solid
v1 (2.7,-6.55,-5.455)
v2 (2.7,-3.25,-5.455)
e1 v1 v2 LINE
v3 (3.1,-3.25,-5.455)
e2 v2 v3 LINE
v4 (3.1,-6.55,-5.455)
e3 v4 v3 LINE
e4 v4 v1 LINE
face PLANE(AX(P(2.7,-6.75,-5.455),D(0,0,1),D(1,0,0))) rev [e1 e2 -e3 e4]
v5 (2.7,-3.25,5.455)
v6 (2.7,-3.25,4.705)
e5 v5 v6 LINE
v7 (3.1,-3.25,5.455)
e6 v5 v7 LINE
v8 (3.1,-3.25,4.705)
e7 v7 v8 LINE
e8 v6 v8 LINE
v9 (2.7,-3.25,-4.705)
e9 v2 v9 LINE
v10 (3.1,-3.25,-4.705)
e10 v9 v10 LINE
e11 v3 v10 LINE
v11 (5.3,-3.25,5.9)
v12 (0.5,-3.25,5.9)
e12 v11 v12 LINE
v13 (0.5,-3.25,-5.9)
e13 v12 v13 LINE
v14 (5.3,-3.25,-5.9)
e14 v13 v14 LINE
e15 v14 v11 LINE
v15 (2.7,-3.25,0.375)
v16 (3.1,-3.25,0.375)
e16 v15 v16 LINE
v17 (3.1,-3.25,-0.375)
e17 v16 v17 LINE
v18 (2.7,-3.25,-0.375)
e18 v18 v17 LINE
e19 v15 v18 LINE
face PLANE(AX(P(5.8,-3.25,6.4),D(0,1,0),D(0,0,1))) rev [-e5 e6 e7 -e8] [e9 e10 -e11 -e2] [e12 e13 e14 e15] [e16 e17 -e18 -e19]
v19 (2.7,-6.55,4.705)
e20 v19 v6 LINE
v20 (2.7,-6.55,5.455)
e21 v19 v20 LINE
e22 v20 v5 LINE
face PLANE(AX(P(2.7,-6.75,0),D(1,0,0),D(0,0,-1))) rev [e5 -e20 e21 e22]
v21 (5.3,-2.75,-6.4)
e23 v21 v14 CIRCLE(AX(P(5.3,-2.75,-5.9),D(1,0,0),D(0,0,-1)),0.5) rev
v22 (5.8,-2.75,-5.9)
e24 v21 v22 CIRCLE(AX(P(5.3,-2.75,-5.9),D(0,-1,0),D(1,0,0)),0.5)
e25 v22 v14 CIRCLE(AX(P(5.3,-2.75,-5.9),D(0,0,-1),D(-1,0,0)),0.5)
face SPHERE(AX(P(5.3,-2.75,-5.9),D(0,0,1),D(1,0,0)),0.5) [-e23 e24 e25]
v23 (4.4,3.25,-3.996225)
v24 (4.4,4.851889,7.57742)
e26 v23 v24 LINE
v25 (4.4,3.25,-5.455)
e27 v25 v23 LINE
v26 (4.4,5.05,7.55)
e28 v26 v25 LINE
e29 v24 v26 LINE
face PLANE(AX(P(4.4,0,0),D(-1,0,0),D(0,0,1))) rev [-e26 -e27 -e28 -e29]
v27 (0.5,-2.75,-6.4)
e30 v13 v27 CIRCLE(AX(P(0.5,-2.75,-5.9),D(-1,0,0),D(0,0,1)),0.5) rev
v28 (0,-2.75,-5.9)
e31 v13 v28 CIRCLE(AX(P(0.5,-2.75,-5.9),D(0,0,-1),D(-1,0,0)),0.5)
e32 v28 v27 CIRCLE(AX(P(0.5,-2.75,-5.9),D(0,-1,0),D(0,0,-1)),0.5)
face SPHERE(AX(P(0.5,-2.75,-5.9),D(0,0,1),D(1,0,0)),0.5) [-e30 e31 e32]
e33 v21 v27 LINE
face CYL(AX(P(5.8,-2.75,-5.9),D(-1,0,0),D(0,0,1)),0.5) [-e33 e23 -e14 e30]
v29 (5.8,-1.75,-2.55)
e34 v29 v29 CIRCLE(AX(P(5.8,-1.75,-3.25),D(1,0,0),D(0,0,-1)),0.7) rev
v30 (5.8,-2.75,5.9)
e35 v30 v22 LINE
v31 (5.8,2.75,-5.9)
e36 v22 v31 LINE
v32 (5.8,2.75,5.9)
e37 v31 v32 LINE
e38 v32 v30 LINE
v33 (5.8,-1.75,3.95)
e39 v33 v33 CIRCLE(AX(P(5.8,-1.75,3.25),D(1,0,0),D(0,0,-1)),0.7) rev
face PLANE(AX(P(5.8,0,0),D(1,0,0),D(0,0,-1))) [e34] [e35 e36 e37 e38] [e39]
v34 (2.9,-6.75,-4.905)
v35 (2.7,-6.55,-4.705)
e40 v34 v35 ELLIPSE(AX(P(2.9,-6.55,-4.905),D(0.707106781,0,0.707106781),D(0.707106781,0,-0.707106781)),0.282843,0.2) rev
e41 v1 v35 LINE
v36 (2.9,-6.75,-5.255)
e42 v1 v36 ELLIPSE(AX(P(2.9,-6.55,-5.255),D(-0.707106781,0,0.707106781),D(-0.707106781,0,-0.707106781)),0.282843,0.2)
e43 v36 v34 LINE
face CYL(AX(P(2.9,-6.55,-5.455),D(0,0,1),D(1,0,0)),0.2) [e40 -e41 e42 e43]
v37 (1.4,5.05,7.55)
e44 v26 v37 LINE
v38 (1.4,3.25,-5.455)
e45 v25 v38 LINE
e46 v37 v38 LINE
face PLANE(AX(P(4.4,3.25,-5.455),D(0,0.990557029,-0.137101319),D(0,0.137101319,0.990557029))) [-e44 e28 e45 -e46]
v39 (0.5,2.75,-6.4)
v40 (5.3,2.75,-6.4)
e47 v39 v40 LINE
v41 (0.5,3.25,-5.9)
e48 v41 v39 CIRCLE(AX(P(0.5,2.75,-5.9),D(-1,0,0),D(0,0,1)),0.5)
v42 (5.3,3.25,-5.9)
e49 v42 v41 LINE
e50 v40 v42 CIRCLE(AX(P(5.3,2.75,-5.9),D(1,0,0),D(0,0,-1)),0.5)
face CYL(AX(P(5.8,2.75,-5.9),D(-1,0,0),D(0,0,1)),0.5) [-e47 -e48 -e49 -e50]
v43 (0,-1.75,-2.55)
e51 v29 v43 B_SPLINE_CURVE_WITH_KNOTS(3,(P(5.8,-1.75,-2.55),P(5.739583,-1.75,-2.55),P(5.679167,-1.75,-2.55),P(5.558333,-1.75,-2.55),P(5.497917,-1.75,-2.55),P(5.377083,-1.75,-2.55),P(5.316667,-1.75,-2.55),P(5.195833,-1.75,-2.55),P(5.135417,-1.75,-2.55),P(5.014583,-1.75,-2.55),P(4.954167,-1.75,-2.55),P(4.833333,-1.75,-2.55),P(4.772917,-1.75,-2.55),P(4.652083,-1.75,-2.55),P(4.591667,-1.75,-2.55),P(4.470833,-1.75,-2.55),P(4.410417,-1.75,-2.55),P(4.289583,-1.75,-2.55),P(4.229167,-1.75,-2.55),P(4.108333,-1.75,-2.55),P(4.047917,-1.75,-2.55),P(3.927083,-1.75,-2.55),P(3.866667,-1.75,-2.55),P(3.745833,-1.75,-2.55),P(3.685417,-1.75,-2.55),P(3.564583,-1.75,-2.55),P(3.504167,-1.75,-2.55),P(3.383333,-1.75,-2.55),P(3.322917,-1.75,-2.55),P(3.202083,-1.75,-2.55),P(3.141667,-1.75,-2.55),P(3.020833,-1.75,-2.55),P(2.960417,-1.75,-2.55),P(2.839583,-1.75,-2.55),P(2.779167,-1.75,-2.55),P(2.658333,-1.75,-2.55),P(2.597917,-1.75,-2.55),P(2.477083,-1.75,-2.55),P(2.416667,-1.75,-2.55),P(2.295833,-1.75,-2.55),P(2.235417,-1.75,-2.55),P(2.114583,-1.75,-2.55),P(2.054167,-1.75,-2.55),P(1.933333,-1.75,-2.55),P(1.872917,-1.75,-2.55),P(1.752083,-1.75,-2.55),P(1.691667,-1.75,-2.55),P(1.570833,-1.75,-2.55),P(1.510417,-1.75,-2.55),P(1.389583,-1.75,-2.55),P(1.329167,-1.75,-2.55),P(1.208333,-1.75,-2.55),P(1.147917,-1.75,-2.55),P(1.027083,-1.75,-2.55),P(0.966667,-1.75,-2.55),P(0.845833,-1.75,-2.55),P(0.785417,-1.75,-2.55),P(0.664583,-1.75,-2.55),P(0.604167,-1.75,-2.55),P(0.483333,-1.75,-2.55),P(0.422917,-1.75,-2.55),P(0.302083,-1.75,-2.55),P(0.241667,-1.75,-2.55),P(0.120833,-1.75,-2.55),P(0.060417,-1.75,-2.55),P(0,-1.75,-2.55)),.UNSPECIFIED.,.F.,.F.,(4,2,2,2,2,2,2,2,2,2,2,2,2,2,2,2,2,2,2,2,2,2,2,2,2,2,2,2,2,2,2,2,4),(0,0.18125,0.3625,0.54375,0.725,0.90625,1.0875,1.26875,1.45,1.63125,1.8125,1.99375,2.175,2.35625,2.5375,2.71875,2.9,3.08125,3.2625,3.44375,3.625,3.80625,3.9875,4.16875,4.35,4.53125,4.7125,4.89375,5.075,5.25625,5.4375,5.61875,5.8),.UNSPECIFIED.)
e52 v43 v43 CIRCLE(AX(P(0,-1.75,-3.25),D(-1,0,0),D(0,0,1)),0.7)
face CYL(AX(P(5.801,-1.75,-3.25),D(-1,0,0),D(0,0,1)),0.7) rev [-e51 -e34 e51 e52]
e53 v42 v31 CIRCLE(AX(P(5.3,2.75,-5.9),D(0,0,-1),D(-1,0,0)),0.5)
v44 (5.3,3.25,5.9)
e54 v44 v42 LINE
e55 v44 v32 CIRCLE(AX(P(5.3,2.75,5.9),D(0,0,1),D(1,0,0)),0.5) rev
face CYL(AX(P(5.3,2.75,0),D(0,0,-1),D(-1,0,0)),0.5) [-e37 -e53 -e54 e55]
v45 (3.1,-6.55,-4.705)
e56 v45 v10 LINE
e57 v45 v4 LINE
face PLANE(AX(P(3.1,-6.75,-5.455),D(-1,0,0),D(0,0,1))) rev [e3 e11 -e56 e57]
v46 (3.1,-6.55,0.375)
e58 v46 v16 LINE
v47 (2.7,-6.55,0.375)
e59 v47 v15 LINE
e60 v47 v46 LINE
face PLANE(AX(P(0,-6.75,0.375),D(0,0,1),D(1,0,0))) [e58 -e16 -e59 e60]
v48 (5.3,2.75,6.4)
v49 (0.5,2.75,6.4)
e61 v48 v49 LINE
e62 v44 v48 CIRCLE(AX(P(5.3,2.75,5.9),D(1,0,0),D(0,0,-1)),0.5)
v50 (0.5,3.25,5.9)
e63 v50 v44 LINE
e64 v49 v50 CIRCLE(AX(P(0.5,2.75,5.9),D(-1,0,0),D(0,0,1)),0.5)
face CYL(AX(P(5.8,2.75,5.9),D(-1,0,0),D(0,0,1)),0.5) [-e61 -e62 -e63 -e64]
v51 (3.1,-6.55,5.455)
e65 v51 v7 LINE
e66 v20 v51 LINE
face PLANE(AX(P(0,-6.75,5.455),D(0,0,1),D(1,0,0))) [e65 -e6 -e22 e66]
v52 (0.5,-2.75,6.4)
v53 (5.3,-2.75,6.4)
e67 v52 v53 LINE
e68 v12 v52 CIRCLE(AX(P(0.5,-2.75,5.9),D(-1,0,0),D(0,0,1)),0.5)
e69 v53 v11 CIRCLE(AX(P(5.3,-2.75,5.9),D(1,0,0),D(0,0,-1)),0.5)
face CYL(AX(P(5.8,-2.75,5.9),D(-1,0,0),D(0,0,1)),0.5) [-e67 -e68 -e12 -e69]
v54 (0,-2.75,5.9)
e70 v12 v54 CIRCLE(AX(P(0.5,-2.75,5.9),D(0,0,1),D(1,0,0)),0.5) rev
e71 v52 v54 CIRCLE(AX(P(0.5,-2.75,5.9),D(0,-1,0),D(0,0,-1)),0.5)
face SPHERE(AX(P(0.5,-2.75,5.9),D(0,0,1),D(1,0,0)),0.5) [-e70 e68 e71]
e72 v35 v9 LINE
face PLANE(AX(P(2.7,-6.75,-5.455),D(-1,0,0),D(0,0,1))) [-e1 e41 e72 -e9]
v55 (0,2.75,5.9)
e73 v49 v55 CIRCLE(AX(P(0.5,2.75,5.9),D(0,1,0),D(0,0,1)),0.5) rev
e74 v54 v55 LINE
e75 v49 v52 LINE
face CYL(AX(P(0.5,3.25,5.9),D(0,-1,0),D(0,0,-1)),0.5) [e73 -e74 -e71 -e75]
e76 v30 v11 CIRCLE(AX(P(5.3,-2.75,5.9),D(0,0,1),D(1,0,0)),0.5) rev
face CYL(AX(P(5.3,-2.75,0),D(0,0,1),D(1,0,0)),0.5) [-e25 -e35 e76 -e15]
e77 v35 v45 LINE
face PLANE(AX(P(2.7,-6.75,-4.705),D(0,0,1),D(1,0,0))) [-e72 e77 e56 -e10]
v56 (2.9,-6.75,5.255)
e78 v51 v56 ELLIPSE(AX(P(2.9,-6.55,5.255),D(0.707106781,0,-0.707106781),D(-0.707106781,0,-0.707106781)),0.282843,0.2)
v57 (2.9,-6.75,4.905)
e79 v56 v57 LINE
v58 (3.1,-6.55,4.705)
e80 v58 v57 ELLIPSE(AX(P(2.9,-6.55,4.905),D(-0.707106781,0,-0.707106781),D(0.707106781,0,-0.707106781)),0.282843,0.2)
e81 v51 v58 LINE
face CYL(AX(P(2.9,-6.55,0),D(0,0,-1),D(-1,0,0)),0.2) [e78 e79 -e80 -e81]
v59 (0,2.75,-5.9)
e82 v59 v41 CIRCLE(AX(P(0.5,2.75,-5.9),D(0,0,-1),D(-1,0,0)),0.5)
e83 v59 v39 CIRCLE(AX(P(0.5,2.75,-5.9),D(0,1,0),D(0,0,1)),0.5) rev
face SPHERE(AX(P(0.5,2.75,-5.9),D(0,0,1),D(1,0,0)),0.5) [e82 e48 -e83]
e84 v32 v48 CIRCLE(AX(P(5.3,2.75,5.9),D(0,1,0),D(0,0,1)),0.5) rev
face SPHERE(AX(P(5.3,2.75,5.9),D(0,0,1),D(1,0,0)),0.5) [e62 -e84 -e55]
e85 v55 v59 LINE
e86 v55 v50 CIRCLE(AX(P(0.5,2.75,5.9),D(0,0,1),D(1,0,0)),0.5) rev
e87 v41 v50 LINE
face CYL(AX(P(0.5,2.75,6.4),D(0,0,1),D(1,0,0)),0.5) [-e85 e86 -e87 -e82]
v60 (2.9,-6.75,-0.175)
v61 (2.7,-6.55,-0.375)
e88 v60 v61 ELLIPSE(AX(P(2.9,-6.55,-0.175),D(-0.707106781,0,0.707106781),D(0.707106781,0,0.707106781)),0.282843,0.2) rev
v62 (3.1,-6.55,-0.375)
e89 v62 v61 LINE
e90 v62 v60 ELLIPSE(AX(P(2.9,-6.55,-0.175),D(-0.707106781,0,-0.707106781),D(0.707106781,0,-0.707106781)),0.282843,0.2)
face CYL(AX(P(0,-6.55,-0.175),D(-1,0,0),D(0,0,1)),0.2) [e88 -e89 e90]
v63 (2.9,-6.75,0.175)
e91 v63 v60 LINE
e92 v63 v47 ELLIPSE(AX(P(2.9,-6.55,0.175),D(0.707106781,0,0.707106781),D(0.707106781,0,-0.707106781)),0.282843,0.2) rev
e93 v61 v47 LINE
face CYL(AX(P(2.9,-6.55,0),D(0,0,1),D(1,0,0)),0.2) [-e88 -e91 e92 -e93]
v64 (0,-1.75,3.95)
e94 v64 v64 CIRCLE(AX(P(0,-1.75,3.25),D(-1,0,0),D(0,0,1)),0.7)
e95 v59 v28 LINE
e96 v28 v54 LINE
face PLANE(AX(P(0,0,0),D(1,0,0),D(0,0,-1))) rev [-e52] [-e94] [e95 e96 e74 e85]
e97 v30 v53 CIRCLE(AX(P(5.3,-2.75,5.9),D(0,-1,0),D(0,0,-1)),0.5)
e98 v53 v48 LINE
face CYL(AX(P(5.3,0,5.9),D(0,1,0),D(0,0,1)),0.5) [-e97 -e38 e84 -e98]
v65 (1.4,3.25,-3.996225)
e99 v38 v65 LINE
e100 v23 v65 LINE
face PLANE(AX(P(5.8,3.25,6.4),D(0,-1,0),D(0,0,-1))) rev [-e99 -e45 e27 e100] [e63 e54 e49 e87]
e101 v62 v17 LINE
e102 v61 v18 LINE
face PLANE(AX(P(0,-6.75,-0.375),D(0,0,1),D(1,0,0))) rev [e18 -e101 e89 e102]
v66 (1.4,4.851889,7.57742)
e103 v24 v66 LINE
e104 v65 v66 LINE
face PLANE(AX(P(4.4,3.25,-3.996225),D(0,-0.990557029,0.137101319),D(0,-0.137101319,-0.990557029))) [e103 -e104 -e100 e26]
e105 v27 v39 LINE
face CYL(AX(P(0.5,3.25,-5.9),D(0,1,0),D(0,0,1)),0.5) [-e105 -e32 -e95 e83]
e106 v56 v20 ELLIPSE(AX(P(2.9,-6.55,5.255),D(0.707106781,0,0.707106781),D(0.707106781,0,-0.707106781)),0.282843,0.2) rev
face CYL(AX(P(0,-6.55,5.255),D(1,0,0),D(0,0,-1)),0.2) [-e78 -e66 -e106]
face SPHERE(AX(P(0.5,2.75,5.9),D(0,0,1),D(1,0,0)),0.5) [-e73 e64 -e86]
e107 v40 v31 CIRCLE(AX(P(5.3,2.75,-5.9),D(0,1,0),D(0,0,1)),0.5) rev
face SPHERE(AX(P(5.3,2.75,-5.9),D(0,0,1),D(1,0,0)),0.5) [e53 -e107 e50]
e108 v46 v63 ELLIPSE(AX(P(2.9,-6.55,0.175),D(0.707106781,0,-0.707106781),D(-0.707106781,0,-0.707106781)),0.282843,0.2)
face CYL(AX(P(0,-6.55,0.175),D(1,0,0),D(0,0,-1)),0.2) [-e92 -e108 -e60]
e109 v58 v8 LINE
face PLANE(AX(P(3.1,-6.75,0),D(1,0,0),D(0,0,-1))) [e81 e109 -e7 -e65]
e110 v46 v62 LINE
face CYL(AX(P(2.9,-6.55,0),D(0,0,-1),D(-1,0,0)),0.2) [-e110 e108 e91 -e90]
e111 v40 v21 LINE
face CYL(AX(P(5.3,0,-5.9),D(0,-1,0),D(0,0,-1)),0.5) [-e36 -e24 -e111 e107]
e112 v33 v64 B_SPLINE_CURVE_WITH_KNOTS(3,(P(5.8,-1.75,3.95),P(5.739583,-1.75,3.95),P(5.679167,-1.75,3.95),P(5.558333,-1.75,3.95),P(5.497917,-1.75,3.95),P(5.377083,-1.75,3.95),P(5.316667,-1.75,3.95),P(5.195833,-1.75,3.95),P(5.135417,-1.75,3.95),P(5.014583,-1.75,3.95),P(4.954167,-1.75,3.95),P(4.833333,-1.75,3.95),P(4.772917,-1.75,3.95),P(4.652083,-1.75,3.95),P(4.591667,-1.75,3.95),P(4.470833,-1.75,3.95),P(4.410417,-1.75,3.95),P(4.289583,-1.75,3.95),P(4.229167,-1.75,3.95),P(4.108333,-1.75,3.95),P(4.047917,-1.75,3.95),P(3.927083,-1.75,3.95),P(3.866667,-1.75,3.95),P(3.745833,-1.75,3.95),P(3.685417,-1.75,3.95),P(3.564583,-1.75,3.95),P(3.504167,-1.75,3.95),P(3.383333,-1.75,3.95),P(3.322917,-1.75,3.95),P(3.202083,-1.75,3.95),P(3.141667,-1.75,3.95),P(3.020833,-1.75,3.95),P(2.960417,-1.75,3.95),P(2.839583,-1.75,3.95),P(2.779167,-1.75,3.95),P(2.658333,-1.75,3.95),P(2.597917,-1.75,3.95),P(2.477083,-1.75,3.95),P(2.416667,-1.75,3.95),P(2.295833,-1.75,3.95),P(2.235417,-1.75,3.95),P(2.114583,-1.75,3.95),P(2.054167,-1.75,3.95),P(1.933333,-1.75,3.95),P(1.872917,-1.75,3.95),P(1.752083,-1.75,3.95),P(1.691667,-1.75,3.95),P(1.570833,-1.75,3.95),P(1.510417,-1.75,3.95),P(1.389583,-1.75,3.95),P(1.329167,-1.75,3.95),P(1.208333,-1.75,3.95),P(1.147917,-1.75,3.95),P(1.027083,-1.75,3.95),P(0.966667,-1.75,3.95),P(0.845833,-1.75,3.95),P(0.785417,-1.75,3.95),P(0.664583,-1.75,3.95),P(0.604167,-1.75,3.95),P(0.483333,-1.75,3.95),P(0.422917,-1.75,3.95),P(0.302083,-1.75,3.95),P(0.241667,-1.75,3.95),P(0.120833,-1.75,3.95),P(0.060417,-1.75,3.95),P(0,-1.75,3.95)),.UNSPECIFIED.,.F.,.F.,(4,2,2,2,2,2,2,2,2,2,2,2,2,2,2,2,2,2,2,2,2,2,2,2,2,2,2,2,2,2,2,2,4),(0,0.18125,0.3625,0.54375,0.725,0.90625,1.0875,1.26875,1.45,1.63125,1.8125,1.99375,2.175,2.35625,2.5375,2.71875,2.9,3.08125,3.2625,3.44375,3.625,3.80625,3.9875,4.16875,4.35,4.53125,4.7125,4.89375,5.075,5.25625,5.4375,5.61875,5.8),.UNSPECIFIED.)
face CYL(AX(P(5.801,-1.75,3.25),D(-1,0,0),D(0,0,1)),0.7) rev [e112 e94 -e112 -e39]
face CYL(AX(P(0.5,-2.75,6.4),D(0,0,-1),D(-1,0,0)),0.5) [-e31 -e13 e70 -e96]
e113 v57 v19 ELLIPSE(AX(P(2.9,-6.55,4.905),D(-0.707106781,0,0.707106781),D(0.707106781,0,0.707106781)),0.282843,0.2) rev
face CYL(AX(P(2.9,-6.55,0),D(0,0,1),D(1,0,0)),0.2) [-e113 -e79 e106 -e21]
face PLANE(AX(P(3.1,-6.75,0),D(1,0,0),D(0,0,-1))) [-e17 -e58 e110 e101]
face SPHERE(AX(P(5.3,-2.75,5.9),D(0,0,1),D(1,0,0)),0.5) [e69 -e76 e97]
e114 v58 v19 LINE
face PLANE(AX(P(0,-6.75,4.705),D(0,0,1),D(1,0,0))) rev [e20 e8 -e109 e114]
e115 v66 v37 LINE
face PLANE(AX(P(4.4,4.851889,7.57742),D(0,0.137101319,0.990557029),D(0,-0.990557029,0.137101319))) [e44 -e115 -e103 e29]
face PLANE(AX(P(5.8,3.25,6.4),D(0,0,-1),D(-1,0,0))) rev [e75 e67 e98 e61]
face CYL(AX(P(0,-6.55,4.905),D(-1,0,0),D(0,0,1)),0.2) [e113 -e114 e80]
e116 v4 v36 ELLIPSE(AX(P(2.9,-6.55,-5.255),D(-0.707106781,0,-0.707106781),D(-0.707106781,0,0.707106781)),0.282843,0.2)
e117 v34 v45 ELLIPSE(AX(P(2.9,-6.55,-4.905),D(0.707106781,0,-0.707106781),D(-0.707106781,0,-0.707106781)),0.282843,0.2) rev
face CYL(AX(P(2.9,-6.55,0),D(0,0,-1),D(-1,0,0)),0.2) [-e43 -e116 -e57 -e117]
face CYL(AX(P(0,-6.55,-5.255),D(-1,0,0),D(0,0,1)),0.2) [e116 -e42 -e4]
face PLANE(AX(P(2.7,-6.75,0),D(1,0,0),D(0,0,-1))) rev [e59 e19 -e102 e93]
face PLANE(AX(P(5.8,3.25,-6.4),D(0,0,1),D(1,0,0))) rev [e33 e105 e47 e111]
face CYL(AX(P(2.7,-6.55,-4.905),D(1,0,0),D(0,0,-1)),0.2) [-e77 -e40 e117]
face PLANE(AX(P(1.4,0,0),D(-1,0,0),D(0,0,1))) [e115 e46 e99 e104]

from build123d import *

# Parameters (mm, degrees)
SKETCH3_W           = 12.8
SKETCH3_H           = 6.5
BOSS_EXTRUDE1_DEPTH = 5.8
SKETCH4_W           = 0.4
SKETCH4_H           = 0.375
SKETCH4_H_2         = 0.75
BOSS_EXTRUDE2_DEPTH = 3.5
FILLET1_R           = 0.2
CUT_EXTRUDE1_REACH  = 12.962
SKETCH5_R           = 0.7
BOSS_EXTRUDE4_START = -1.4
BOSS_EXTRUDE4_DEPTH = 3
FILLET2_R           = 0.5


with BuildPart() as part:
    # Sketch3 → Boss-Extrude1 (new body)
    with BuildSketch(Plane(origin=(0, 0, 0), x_dir=(0, 0, -1), z_dir=(1, 0, 0))):
        Rectangle(SKETCH3_W, SKETCH3_H)
    extrude(amount=BOSS_EXTRUDE1_DEPTH)

    # Sketch4 → Boss-Extrude2 (add)
    with BuildSketch(Plane.XZ.offset(3.25)):
        with Locations((2.9, -0.1875)):
            Rectangle(SKETCH4_W, SKETCH4_H)
        with Locations((2.9, 0.1875)):
            Rectangle(SKETCH4_W, SKETCH4_H)
        with Locations((2.9, 5.08)):
            Rectangle(SKETCH4_W, SKETCH4_H_2)
        with Locations((2.9, -5.08)):
            Rectangle(SKETCH4_W, SKETCH4_H_2)
    extrude(amount=BOSS_EXTRUDE2_DEPTH)

    # Fillet1
    fillet1_edges = [part.edges().sort_by_distance(p)[0] for p in [
        (3.1, -6.75, 0),
        (2.9, -6.75, 0.375),
        (2.7, -6.75, 0),
        (2.9, -6.75, -0.375),
        (3.1, -6.75, 5.08),
        (2.9, -6.75, 5.455),
        (2.7, -6.75, 5.08),
        (2.9, -6.75, 4.705),
        (2.9, -6.75, -4.705),
        (2.7, -6.75, -5.08),
        (2.9, -6.75, -5.455),
        (3.1, -6.75, -5.08),
    ]]
    fillet(fillet1_edges, radius=FILLET1_R - 0.0001)  # a hair under: the kernel refuses the full size

    # Sketch5 → Cut-Extrude1 (cut, up to next)
    with BuildSketch(Plane.ZY, mode=Mode.PRIVATE) as cut_extrude1_sk1:
        with Locations((-3.25, -1.75)):
            Circle(SKETCH5_R)
    cut_extrude1_tool1 = extrude(cut_extrude1_sk1.sketch, amount=-CUT_EXTRUDE1_REACH, mode=Mode.PRIVATE) & part.part
    # Sketch5 → Cut-Extrude1 (cut, up to next)
    with BuildSketch(Plane.ZY, mode=Mode.PRIVATE) as cut_extrude1_sk2:
        with Locations((3.25, -1.75)):
            Circle(SKETCH5_R)
    cut_extrude1_tool2 = extrude(cut_extrude1_sk2.sketch, amount=-CUT_EXTRUDE1_REACH, mode=Mode.PRIVATE) & part.part
    add(cut_extrude1_tool1.solids().sort_by_distance((0, -1.75, -3.25))[0], mode=Mode.SUBTRACT)
    add(cut_extrude1_tool2.solids().sort_by_distance((0, -1.75, 3.25))[0], mode=Mode.SUBTRACT)

    # Sketch6 → Boss-Extrude4 (add)
    with BuildSketch(Plane.ZY.offset(BOSS_EXTRUDE4_START)):
        Polygon((-5.455, 3.25), (7.55, 5.05), (7.577420264, 4.851888594), (-3.996224829, 3.25), align=None)
    extrude(amount=-BOSS_EXTRUDE4_DEPTH)

    # Fillet2
    fillet2_edges = [part.edges().sort_by_distance(p)[0] for p in [
        (5.8, 0, 6.4),
        (5.8, -3.25, 0),
        (5.8, 0, -6.4),
        (0, -3.25, 0),
        (0, 0, 6.4),
        (0, 3.25, 0),
        (0, 0, -6.4),
        (2.9, -3.25, -6.4),
        (2.9, -3.25, 6.4),
        (2.9, 3.25, 6.4),
        (2.9, 3.25, -6.4),
        (5.8, 3.25, 0),
    ]]
    fillet(fillet2_edges, radius=FILLET2_R)


solid = part.part
